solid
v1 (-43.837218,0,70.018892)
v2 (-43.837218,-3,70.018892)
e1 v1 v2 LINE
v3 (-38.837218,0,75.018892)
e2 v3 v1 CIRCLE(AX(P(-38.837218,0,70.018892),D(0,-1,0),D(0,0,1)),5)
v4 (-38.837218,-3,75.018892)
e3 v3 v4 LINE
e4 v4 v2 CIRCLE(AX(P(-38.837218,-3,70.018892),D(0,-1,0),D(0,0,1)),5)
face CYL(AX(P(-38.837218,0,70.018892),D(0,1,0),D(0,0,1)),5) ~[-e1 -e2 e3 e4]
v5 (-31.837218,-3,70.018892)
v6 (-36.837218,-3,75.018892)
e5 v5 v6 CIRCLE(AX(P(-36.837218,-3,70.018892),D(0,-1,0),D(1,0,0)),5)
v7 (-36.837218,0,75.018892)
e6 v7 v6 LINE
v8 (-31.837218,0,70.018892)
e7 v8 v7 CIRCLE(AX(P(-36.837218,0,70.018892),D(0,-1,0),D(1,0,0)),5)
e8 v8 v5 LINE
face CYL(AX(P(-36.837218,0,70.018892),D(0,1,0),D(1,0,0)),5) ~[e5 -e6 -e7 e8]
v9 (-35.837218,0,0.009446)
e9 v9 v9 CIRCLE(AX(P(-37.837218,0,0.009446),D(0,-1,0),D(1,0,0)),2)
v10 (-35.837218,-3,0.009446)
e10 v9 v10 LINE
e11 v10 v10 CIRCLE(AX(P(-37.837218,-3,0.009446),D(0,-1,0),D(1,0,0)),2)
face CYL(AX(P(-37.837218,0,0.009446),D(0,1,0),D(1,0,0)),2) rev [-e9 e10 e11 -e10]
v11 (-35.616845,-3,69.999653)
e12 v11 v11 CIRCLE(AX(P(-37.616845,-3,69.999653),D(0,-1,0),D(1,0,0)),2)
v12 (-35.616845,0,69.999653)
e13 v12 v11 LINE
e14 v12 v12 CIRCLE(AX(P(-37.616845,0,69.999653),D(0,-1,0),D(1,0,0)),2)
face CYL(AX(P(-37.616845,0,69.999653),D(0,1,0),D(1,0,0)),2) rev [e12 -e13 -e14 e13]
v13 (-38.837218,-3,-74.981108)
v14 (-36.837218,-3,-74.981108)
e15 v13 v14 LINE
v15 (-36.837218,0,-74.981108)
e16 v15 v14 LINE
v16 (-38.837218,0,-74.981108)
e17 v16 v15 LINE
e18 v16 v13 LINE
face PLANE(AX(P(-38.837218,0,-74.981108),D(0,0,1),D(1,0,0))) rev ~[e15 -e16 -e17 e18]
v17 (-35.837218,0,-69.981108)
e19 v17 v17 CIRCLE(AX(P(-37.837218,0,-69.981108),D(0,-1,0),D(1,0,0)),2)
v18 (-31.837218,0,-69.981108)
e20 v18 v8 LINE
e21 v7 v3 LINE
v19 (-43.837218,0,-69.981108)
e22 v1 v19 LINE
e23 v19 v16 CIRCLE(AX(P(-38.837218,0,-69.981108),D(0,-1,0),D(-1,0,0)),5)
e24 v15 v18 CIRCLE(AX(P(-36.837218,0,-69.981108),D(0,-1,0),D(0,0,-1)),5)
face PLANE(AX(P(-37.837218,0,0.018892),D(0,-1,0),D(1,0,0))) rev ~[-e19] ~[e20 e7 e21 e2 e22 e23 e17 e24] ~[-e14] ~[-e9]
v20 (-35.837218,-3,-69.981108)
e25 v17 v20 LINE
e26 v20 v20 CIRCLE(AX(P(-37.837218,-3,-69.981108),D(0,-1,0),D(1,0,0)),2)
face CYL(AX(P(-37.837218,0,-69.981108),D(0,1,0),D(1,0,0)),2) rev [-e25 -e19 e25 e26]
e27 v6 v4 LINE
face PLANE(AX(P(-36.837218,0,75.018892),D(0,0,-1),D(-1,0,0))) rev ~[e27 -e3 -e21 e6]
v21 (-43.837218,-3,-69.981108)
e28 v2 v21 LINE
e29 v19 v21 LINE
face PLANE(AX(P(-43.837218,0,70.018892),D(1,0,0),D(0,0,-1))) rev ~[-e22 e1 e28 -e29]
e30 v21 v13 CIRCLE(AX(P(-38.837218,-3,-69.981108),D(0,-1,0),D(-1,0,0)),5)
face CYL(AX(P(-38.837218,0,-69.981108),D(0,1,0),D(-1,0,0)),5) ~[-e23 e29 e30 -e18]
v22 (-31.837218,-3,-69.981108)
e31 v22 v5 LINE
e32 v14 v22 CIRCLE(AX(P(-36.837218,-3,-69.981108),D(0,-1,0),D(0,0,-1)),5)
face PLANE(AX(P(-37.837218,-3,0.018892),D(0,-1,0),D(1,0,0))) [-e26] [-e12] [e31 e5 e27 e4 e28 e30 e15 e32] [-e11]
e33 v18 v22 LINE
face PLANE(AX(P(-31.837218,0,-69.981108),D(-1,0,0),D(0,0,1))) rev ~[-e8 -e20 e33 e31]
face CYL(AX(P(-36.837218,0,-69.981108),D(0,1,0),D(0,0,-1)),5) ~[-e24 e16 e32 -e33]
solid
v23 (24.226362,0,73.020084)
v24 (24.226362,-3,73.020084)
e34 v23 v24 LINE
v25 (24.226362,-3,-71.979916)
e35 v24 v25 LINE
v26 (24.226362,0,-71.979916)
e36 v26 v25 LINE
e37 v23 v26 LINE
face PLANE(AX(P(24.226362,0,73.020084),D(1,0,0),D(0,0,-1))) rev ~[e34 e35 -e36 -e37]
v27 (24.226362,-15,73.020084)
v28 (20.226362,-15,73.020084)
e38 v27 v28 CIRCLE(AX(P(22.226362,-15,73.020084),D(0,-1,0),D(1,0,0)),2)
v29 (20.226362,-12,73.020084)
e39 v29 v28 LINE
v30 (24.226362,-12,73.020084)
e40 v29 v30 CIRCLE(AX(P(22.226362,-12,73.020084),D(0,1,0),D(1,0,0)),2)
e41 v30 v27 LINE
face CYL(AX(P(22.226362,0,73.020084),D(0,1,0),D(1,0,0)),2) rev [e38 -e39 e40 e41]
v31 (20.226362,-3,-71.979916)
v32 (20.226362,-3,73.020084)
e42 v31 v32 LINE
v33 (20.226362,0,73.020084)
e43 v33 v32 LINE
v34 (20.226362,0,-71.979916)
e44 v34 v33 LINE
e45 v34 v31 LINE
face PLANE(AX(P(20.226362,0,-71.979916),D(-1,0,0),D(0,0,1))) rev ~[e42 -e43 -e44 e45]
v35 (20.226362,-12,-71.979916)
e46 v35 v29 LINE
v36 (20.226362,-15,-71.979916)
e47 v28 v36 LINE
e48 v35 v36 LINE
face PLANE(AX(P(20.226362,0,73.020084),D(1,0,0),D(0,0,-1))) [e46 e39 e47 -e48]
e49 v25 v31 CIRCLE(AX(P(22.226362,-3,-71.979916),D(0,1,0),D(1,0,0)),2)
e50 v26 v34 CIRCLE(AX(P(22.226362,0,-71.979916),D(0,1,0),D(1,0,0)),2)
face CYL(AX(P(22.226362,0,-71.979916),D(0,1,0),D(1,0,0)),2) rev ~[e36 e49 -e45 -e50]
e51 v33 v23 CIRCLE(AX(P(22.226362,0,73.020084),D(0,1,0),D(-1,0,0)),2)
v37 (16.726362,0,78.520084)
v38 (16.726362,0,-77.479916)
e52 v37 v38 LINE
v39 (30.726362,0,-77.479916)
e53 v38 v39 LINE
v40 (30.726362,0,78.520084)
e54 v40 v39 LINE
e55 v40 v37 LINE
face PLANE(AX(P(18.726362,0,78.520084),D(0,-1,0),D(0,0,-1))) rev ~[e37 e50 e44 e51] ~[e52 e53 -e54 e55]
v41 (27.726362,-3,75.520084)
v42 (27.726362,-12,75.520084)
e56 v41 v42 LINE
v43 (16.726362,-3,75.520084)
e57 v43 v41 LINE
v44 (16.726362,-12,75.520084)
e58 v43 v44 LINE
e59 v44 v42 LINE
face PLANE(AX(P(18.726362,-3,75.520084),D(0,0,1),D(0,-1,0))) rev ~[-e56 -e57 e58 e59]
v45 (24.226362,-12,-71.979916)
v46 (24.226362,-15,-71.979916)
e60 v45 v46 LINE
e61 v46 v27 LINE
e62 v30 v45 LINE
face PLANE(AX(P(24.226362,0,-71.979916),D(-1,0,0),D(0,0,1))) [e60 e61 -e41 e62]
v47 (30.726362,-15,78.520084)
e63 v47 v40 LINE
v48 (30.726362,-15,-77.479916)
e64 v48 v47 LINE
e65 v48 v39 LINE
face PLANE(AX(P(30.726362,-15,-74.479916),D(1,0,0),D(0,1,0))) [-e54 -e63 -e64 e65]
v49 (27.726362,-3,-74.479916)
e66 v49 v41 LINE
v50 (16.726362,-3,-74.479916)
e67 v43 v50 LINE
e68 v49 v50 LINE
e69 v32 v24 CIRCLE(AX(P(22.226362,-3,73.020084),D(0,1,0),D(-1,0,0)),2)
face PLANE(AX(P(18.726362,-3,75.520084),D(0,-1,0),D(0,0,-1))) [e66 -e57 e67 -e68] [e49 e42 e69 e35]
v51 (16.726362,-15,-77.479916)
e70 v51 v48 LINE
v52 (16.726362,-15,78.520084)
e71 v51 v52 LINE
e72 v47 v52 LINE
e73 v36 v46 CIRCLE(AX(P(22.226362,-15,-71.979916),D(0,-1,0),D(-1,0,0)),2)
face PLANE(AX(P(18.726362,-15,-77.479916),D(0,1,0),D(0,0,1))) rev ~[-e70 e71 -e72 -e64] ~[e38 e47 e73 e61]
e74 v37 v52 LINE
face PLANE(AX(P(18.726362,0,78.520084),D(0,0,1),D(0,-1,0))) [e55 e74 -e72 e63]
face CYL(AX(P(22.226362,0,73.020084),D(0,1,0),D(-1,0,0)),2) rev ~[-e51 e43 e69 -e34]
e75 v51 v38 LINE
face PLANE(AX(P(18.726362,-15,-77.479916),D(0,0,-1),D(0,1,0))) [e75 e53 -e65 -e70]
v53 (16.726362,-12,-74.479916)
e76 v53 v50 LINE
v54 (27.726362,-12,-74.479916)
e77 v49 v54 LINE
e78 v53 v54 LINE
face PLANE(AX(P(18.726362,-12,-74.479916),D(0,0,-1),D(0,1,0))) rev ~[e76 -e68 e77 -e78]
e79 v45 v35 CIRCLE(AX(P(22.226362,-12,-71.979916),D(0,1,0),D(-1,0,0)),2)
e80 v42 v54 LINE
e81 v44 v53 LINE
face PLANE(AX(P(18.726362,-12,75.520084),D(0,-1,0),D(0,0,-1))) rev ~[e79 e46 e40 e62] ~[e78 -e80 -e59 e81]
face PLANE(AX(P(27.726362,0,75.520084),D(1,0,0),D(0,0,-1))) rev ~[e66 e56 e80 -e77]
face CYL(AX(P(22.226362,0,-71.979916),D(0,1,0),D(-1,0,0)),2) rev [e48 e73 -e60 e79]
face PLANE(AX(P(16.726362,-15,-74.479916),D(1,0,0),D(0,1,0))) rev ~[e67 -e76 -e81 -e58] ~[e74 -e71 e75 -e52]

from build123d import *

# Parameters (mm, degrees)
F0_R      = 2
F1_DEPTH  = 3
F2_DEPTH  = 3
F3_DEPTH  = 15
F4_W      = 9
F4_H      = 3
F5_DEPTH  = 150
F6_W      = 9
F6_H      = 9
F7_DEPTH  = 3
F8_START  = -153
F7_FACE_W = 12
F7_FACE_H = 15
F8_DEPTH  = 3
F9_DEPTH  = 15
F10_DEPTH = 2


with BuildPart() as f1:
    # F0 (on Front) → F1 (new body)
    with BuildSketch(Plane.XZ):
        with BuildLine():
            Line((-36.8372175097, 75.0188916922), (-38.8372175097, 75.0188916922))
            ThreePointArc((-38.8372175097, 75.0188916922), (-42.3727514157, 73.5544255981), (-43.8372175097, 70.0188916922))
            Line((-43.8372175097, 70.0188916922), (-43.8372175097, -69.9811083078))
            ThreePointArc((-43.8372175097, -69.9811083078), (-42.3727514157, -73.5166422138), (-38.8372175097, -74.9811083078))
            Line((-38.8372175097, -74.9811083078), (-36.8372175097, -74.9811083078))
            ThreePointArc((-36.8372175097, -74.9811083078), (-33.3016836038, -73.5166422138), (-31.8372175097, -69.9811083078))
            Line((-31.8372175097, -69.9811083078), (-31.8372175097, 70.0188916922))
            ThreePointArc((-31.8372175097, 70.0188916922), (-33.3016836038, 73.5544255981), (-36.8372175097, 75.0188916922))
        make_face()
        with Locations((-37.8372175097, -69.9811083078)):
            Circle(F0_R, mode=Mode.SUBTRACT)
        with Locations((-37.8372175097, 0.0094458461)):
            Circle(F0_R, mode=Mode.SUBTRACT)
        with Locations((-37.616844722, 69.9996530654)):
            Circle(F0_R, mode=Mode.SUBTRACT)
    extrude(amount=F1_DEPTH)


with BuildPart() as f2:
    # F0 (on Front) → F2 (new body)
    with BuildSketch(Plane.XZ):
        Polygon((30.7263619155, 75.5200837851), (27.7263619155, 75.5200837851), (27.7263619155, -74.4799162149), (30.7263619155, -74.4799162149), (30.7263619155, -69.9799162149), (30.7263619155, 70.0200837851), align=None)
        Polygon((27.7263619155, 75.5200837851), (24.2263619155, 75.5200837851), (24.2263619155, 73.0200837851), (24.2263619155, -71.9799162149), (24.2263619155, -74.4799162149), (27.7263619155, -74.4799162149), align=None)
        with BuildLine():
            Line((24.2263619155, 75.5200837851), (20.2263619155, 75.5200837851))
            Line((20.2263619155, 75.5200837851), (20.2263619155, 73.0200837851))
            ThreePointArc((20.2263619155, 73.0200837851), (22.2263619155, 75.0200837851), (24.2263619155, 73.0200837851))
            Line((24.2263619155, 73.0200837851), (24.2263619155, 75.5200837851))
        make_face()
        with BuildLine():
            Line((20.2263619155, -71.9799162149), (20.2263619155, -74.4799162149))
            Line((20.2263619155, -74.4799162149), (24.2263619155, -74.4799162149))
            Line((24.2263619155, -74.4799162149), (24.2263619155, -71.9799162149))
            ThreePointArc((24.2263619155, -71.9799162149), (22.2263619155, -73.9799162149), (20.2263619155, -71.9799162149))
        make_face()
        Polygon((18.7263619155, 75.5200837851), (18.7263619155, 70.5200837851), (18.7263619155, -69.4799162149), (18.7263619155, -74.4799162149), (20.2263619155, -74.4799162149), (20.2263619155, -71.9799162149), (20.2263619155, 73.0200837851), (20.2263619155, 75.5200837851), align=None)
    extrude(amount=F2_DEPTH)

    # F0 (on Front) → F3 (join)
    with BuildSketch(Plane.XZ):
        Polygon((30.7263619155, 75.5200837851), (27.7263619155, 75.5200837851), (27.7263619155, -74.4799162149), (30.7263619155, -74.4799162149), (30.7263619155, -69.9799162149), (30.7263619155, 70.0200837851), align=None)
    extrude(amount=F3_DEPTH)

    # F4 (on face) → F5 (join, through all)
    with BuildSketch(Plane.XY.offset(75.5200837851)):
        with Locations((23.2263619155, -13.5)):
            Rectangle(F4_W, F4_H)
    extrude(amount=-F5_DEPTH)

    # F6 (on face) → F7 (join)
    with BuildSketch(Plane.XY.offset(75.5200837851)):
        Polygon((18.7263619155, 0), (18.7263619155, -3), (27.7263619155, -3), (27.7263619155, -12), (18.7263619155, -12), (18.7263619155, -15), (30.7263619155, -15), (30.7263619155, 0), align=None)
        with Locations((23.2263619155, -7.5)):
            Rectangle(F6_W, F6_H)
    extrude(amount=F7_DEPTH)

    # F7_face (on face) → F8 (join)
    with BuildSketch(Plane(origin=(24.7263619155, -7.5, 78.5200837851), x_dir=(1, 0, 0), z_dir=(0, 0, 1)).offset(F8_START)):
        Rectangle(F7_FACE_W, F7_FACE_H)
    extrude(amount=-F8_DEPTH)

    # F0 (on Front) → F9 (cut, through all)
    with BuildSketch(Plane.XZ):
        with BuildLine():
            ThreePointArc((24.2263619155, 73.0200837851), (22.2263619155, 75.0200837851), (20.2263619155, 73.0200837851))
            Line((20.2263619155, 73.0200837851), (20.2263619155, -71.9799162149))
            ThreePointArc((20.2263619155, -71.9799162149), (22.2263619155, -73.9799162149), (24.2263619155, -71.9799162149))
            Line((24.2263619155, -71.9799162149), (24.2263619155, 73.0200837851))
        make_face()
    extrude(amount=F9_DEPTH, mode=Mode.SUBTRACT)

    # F10 (add): a face of the model
    f10_faces = [f2.faces().sort_by_distance(p)[0] for p in [
        (18.7263619155, -1.5671949464, 0.5200837851),
    ]]
    extrude(f10_faces, amount=F10_DEPTH)


solid = Compound([f1.part, f2.part])
